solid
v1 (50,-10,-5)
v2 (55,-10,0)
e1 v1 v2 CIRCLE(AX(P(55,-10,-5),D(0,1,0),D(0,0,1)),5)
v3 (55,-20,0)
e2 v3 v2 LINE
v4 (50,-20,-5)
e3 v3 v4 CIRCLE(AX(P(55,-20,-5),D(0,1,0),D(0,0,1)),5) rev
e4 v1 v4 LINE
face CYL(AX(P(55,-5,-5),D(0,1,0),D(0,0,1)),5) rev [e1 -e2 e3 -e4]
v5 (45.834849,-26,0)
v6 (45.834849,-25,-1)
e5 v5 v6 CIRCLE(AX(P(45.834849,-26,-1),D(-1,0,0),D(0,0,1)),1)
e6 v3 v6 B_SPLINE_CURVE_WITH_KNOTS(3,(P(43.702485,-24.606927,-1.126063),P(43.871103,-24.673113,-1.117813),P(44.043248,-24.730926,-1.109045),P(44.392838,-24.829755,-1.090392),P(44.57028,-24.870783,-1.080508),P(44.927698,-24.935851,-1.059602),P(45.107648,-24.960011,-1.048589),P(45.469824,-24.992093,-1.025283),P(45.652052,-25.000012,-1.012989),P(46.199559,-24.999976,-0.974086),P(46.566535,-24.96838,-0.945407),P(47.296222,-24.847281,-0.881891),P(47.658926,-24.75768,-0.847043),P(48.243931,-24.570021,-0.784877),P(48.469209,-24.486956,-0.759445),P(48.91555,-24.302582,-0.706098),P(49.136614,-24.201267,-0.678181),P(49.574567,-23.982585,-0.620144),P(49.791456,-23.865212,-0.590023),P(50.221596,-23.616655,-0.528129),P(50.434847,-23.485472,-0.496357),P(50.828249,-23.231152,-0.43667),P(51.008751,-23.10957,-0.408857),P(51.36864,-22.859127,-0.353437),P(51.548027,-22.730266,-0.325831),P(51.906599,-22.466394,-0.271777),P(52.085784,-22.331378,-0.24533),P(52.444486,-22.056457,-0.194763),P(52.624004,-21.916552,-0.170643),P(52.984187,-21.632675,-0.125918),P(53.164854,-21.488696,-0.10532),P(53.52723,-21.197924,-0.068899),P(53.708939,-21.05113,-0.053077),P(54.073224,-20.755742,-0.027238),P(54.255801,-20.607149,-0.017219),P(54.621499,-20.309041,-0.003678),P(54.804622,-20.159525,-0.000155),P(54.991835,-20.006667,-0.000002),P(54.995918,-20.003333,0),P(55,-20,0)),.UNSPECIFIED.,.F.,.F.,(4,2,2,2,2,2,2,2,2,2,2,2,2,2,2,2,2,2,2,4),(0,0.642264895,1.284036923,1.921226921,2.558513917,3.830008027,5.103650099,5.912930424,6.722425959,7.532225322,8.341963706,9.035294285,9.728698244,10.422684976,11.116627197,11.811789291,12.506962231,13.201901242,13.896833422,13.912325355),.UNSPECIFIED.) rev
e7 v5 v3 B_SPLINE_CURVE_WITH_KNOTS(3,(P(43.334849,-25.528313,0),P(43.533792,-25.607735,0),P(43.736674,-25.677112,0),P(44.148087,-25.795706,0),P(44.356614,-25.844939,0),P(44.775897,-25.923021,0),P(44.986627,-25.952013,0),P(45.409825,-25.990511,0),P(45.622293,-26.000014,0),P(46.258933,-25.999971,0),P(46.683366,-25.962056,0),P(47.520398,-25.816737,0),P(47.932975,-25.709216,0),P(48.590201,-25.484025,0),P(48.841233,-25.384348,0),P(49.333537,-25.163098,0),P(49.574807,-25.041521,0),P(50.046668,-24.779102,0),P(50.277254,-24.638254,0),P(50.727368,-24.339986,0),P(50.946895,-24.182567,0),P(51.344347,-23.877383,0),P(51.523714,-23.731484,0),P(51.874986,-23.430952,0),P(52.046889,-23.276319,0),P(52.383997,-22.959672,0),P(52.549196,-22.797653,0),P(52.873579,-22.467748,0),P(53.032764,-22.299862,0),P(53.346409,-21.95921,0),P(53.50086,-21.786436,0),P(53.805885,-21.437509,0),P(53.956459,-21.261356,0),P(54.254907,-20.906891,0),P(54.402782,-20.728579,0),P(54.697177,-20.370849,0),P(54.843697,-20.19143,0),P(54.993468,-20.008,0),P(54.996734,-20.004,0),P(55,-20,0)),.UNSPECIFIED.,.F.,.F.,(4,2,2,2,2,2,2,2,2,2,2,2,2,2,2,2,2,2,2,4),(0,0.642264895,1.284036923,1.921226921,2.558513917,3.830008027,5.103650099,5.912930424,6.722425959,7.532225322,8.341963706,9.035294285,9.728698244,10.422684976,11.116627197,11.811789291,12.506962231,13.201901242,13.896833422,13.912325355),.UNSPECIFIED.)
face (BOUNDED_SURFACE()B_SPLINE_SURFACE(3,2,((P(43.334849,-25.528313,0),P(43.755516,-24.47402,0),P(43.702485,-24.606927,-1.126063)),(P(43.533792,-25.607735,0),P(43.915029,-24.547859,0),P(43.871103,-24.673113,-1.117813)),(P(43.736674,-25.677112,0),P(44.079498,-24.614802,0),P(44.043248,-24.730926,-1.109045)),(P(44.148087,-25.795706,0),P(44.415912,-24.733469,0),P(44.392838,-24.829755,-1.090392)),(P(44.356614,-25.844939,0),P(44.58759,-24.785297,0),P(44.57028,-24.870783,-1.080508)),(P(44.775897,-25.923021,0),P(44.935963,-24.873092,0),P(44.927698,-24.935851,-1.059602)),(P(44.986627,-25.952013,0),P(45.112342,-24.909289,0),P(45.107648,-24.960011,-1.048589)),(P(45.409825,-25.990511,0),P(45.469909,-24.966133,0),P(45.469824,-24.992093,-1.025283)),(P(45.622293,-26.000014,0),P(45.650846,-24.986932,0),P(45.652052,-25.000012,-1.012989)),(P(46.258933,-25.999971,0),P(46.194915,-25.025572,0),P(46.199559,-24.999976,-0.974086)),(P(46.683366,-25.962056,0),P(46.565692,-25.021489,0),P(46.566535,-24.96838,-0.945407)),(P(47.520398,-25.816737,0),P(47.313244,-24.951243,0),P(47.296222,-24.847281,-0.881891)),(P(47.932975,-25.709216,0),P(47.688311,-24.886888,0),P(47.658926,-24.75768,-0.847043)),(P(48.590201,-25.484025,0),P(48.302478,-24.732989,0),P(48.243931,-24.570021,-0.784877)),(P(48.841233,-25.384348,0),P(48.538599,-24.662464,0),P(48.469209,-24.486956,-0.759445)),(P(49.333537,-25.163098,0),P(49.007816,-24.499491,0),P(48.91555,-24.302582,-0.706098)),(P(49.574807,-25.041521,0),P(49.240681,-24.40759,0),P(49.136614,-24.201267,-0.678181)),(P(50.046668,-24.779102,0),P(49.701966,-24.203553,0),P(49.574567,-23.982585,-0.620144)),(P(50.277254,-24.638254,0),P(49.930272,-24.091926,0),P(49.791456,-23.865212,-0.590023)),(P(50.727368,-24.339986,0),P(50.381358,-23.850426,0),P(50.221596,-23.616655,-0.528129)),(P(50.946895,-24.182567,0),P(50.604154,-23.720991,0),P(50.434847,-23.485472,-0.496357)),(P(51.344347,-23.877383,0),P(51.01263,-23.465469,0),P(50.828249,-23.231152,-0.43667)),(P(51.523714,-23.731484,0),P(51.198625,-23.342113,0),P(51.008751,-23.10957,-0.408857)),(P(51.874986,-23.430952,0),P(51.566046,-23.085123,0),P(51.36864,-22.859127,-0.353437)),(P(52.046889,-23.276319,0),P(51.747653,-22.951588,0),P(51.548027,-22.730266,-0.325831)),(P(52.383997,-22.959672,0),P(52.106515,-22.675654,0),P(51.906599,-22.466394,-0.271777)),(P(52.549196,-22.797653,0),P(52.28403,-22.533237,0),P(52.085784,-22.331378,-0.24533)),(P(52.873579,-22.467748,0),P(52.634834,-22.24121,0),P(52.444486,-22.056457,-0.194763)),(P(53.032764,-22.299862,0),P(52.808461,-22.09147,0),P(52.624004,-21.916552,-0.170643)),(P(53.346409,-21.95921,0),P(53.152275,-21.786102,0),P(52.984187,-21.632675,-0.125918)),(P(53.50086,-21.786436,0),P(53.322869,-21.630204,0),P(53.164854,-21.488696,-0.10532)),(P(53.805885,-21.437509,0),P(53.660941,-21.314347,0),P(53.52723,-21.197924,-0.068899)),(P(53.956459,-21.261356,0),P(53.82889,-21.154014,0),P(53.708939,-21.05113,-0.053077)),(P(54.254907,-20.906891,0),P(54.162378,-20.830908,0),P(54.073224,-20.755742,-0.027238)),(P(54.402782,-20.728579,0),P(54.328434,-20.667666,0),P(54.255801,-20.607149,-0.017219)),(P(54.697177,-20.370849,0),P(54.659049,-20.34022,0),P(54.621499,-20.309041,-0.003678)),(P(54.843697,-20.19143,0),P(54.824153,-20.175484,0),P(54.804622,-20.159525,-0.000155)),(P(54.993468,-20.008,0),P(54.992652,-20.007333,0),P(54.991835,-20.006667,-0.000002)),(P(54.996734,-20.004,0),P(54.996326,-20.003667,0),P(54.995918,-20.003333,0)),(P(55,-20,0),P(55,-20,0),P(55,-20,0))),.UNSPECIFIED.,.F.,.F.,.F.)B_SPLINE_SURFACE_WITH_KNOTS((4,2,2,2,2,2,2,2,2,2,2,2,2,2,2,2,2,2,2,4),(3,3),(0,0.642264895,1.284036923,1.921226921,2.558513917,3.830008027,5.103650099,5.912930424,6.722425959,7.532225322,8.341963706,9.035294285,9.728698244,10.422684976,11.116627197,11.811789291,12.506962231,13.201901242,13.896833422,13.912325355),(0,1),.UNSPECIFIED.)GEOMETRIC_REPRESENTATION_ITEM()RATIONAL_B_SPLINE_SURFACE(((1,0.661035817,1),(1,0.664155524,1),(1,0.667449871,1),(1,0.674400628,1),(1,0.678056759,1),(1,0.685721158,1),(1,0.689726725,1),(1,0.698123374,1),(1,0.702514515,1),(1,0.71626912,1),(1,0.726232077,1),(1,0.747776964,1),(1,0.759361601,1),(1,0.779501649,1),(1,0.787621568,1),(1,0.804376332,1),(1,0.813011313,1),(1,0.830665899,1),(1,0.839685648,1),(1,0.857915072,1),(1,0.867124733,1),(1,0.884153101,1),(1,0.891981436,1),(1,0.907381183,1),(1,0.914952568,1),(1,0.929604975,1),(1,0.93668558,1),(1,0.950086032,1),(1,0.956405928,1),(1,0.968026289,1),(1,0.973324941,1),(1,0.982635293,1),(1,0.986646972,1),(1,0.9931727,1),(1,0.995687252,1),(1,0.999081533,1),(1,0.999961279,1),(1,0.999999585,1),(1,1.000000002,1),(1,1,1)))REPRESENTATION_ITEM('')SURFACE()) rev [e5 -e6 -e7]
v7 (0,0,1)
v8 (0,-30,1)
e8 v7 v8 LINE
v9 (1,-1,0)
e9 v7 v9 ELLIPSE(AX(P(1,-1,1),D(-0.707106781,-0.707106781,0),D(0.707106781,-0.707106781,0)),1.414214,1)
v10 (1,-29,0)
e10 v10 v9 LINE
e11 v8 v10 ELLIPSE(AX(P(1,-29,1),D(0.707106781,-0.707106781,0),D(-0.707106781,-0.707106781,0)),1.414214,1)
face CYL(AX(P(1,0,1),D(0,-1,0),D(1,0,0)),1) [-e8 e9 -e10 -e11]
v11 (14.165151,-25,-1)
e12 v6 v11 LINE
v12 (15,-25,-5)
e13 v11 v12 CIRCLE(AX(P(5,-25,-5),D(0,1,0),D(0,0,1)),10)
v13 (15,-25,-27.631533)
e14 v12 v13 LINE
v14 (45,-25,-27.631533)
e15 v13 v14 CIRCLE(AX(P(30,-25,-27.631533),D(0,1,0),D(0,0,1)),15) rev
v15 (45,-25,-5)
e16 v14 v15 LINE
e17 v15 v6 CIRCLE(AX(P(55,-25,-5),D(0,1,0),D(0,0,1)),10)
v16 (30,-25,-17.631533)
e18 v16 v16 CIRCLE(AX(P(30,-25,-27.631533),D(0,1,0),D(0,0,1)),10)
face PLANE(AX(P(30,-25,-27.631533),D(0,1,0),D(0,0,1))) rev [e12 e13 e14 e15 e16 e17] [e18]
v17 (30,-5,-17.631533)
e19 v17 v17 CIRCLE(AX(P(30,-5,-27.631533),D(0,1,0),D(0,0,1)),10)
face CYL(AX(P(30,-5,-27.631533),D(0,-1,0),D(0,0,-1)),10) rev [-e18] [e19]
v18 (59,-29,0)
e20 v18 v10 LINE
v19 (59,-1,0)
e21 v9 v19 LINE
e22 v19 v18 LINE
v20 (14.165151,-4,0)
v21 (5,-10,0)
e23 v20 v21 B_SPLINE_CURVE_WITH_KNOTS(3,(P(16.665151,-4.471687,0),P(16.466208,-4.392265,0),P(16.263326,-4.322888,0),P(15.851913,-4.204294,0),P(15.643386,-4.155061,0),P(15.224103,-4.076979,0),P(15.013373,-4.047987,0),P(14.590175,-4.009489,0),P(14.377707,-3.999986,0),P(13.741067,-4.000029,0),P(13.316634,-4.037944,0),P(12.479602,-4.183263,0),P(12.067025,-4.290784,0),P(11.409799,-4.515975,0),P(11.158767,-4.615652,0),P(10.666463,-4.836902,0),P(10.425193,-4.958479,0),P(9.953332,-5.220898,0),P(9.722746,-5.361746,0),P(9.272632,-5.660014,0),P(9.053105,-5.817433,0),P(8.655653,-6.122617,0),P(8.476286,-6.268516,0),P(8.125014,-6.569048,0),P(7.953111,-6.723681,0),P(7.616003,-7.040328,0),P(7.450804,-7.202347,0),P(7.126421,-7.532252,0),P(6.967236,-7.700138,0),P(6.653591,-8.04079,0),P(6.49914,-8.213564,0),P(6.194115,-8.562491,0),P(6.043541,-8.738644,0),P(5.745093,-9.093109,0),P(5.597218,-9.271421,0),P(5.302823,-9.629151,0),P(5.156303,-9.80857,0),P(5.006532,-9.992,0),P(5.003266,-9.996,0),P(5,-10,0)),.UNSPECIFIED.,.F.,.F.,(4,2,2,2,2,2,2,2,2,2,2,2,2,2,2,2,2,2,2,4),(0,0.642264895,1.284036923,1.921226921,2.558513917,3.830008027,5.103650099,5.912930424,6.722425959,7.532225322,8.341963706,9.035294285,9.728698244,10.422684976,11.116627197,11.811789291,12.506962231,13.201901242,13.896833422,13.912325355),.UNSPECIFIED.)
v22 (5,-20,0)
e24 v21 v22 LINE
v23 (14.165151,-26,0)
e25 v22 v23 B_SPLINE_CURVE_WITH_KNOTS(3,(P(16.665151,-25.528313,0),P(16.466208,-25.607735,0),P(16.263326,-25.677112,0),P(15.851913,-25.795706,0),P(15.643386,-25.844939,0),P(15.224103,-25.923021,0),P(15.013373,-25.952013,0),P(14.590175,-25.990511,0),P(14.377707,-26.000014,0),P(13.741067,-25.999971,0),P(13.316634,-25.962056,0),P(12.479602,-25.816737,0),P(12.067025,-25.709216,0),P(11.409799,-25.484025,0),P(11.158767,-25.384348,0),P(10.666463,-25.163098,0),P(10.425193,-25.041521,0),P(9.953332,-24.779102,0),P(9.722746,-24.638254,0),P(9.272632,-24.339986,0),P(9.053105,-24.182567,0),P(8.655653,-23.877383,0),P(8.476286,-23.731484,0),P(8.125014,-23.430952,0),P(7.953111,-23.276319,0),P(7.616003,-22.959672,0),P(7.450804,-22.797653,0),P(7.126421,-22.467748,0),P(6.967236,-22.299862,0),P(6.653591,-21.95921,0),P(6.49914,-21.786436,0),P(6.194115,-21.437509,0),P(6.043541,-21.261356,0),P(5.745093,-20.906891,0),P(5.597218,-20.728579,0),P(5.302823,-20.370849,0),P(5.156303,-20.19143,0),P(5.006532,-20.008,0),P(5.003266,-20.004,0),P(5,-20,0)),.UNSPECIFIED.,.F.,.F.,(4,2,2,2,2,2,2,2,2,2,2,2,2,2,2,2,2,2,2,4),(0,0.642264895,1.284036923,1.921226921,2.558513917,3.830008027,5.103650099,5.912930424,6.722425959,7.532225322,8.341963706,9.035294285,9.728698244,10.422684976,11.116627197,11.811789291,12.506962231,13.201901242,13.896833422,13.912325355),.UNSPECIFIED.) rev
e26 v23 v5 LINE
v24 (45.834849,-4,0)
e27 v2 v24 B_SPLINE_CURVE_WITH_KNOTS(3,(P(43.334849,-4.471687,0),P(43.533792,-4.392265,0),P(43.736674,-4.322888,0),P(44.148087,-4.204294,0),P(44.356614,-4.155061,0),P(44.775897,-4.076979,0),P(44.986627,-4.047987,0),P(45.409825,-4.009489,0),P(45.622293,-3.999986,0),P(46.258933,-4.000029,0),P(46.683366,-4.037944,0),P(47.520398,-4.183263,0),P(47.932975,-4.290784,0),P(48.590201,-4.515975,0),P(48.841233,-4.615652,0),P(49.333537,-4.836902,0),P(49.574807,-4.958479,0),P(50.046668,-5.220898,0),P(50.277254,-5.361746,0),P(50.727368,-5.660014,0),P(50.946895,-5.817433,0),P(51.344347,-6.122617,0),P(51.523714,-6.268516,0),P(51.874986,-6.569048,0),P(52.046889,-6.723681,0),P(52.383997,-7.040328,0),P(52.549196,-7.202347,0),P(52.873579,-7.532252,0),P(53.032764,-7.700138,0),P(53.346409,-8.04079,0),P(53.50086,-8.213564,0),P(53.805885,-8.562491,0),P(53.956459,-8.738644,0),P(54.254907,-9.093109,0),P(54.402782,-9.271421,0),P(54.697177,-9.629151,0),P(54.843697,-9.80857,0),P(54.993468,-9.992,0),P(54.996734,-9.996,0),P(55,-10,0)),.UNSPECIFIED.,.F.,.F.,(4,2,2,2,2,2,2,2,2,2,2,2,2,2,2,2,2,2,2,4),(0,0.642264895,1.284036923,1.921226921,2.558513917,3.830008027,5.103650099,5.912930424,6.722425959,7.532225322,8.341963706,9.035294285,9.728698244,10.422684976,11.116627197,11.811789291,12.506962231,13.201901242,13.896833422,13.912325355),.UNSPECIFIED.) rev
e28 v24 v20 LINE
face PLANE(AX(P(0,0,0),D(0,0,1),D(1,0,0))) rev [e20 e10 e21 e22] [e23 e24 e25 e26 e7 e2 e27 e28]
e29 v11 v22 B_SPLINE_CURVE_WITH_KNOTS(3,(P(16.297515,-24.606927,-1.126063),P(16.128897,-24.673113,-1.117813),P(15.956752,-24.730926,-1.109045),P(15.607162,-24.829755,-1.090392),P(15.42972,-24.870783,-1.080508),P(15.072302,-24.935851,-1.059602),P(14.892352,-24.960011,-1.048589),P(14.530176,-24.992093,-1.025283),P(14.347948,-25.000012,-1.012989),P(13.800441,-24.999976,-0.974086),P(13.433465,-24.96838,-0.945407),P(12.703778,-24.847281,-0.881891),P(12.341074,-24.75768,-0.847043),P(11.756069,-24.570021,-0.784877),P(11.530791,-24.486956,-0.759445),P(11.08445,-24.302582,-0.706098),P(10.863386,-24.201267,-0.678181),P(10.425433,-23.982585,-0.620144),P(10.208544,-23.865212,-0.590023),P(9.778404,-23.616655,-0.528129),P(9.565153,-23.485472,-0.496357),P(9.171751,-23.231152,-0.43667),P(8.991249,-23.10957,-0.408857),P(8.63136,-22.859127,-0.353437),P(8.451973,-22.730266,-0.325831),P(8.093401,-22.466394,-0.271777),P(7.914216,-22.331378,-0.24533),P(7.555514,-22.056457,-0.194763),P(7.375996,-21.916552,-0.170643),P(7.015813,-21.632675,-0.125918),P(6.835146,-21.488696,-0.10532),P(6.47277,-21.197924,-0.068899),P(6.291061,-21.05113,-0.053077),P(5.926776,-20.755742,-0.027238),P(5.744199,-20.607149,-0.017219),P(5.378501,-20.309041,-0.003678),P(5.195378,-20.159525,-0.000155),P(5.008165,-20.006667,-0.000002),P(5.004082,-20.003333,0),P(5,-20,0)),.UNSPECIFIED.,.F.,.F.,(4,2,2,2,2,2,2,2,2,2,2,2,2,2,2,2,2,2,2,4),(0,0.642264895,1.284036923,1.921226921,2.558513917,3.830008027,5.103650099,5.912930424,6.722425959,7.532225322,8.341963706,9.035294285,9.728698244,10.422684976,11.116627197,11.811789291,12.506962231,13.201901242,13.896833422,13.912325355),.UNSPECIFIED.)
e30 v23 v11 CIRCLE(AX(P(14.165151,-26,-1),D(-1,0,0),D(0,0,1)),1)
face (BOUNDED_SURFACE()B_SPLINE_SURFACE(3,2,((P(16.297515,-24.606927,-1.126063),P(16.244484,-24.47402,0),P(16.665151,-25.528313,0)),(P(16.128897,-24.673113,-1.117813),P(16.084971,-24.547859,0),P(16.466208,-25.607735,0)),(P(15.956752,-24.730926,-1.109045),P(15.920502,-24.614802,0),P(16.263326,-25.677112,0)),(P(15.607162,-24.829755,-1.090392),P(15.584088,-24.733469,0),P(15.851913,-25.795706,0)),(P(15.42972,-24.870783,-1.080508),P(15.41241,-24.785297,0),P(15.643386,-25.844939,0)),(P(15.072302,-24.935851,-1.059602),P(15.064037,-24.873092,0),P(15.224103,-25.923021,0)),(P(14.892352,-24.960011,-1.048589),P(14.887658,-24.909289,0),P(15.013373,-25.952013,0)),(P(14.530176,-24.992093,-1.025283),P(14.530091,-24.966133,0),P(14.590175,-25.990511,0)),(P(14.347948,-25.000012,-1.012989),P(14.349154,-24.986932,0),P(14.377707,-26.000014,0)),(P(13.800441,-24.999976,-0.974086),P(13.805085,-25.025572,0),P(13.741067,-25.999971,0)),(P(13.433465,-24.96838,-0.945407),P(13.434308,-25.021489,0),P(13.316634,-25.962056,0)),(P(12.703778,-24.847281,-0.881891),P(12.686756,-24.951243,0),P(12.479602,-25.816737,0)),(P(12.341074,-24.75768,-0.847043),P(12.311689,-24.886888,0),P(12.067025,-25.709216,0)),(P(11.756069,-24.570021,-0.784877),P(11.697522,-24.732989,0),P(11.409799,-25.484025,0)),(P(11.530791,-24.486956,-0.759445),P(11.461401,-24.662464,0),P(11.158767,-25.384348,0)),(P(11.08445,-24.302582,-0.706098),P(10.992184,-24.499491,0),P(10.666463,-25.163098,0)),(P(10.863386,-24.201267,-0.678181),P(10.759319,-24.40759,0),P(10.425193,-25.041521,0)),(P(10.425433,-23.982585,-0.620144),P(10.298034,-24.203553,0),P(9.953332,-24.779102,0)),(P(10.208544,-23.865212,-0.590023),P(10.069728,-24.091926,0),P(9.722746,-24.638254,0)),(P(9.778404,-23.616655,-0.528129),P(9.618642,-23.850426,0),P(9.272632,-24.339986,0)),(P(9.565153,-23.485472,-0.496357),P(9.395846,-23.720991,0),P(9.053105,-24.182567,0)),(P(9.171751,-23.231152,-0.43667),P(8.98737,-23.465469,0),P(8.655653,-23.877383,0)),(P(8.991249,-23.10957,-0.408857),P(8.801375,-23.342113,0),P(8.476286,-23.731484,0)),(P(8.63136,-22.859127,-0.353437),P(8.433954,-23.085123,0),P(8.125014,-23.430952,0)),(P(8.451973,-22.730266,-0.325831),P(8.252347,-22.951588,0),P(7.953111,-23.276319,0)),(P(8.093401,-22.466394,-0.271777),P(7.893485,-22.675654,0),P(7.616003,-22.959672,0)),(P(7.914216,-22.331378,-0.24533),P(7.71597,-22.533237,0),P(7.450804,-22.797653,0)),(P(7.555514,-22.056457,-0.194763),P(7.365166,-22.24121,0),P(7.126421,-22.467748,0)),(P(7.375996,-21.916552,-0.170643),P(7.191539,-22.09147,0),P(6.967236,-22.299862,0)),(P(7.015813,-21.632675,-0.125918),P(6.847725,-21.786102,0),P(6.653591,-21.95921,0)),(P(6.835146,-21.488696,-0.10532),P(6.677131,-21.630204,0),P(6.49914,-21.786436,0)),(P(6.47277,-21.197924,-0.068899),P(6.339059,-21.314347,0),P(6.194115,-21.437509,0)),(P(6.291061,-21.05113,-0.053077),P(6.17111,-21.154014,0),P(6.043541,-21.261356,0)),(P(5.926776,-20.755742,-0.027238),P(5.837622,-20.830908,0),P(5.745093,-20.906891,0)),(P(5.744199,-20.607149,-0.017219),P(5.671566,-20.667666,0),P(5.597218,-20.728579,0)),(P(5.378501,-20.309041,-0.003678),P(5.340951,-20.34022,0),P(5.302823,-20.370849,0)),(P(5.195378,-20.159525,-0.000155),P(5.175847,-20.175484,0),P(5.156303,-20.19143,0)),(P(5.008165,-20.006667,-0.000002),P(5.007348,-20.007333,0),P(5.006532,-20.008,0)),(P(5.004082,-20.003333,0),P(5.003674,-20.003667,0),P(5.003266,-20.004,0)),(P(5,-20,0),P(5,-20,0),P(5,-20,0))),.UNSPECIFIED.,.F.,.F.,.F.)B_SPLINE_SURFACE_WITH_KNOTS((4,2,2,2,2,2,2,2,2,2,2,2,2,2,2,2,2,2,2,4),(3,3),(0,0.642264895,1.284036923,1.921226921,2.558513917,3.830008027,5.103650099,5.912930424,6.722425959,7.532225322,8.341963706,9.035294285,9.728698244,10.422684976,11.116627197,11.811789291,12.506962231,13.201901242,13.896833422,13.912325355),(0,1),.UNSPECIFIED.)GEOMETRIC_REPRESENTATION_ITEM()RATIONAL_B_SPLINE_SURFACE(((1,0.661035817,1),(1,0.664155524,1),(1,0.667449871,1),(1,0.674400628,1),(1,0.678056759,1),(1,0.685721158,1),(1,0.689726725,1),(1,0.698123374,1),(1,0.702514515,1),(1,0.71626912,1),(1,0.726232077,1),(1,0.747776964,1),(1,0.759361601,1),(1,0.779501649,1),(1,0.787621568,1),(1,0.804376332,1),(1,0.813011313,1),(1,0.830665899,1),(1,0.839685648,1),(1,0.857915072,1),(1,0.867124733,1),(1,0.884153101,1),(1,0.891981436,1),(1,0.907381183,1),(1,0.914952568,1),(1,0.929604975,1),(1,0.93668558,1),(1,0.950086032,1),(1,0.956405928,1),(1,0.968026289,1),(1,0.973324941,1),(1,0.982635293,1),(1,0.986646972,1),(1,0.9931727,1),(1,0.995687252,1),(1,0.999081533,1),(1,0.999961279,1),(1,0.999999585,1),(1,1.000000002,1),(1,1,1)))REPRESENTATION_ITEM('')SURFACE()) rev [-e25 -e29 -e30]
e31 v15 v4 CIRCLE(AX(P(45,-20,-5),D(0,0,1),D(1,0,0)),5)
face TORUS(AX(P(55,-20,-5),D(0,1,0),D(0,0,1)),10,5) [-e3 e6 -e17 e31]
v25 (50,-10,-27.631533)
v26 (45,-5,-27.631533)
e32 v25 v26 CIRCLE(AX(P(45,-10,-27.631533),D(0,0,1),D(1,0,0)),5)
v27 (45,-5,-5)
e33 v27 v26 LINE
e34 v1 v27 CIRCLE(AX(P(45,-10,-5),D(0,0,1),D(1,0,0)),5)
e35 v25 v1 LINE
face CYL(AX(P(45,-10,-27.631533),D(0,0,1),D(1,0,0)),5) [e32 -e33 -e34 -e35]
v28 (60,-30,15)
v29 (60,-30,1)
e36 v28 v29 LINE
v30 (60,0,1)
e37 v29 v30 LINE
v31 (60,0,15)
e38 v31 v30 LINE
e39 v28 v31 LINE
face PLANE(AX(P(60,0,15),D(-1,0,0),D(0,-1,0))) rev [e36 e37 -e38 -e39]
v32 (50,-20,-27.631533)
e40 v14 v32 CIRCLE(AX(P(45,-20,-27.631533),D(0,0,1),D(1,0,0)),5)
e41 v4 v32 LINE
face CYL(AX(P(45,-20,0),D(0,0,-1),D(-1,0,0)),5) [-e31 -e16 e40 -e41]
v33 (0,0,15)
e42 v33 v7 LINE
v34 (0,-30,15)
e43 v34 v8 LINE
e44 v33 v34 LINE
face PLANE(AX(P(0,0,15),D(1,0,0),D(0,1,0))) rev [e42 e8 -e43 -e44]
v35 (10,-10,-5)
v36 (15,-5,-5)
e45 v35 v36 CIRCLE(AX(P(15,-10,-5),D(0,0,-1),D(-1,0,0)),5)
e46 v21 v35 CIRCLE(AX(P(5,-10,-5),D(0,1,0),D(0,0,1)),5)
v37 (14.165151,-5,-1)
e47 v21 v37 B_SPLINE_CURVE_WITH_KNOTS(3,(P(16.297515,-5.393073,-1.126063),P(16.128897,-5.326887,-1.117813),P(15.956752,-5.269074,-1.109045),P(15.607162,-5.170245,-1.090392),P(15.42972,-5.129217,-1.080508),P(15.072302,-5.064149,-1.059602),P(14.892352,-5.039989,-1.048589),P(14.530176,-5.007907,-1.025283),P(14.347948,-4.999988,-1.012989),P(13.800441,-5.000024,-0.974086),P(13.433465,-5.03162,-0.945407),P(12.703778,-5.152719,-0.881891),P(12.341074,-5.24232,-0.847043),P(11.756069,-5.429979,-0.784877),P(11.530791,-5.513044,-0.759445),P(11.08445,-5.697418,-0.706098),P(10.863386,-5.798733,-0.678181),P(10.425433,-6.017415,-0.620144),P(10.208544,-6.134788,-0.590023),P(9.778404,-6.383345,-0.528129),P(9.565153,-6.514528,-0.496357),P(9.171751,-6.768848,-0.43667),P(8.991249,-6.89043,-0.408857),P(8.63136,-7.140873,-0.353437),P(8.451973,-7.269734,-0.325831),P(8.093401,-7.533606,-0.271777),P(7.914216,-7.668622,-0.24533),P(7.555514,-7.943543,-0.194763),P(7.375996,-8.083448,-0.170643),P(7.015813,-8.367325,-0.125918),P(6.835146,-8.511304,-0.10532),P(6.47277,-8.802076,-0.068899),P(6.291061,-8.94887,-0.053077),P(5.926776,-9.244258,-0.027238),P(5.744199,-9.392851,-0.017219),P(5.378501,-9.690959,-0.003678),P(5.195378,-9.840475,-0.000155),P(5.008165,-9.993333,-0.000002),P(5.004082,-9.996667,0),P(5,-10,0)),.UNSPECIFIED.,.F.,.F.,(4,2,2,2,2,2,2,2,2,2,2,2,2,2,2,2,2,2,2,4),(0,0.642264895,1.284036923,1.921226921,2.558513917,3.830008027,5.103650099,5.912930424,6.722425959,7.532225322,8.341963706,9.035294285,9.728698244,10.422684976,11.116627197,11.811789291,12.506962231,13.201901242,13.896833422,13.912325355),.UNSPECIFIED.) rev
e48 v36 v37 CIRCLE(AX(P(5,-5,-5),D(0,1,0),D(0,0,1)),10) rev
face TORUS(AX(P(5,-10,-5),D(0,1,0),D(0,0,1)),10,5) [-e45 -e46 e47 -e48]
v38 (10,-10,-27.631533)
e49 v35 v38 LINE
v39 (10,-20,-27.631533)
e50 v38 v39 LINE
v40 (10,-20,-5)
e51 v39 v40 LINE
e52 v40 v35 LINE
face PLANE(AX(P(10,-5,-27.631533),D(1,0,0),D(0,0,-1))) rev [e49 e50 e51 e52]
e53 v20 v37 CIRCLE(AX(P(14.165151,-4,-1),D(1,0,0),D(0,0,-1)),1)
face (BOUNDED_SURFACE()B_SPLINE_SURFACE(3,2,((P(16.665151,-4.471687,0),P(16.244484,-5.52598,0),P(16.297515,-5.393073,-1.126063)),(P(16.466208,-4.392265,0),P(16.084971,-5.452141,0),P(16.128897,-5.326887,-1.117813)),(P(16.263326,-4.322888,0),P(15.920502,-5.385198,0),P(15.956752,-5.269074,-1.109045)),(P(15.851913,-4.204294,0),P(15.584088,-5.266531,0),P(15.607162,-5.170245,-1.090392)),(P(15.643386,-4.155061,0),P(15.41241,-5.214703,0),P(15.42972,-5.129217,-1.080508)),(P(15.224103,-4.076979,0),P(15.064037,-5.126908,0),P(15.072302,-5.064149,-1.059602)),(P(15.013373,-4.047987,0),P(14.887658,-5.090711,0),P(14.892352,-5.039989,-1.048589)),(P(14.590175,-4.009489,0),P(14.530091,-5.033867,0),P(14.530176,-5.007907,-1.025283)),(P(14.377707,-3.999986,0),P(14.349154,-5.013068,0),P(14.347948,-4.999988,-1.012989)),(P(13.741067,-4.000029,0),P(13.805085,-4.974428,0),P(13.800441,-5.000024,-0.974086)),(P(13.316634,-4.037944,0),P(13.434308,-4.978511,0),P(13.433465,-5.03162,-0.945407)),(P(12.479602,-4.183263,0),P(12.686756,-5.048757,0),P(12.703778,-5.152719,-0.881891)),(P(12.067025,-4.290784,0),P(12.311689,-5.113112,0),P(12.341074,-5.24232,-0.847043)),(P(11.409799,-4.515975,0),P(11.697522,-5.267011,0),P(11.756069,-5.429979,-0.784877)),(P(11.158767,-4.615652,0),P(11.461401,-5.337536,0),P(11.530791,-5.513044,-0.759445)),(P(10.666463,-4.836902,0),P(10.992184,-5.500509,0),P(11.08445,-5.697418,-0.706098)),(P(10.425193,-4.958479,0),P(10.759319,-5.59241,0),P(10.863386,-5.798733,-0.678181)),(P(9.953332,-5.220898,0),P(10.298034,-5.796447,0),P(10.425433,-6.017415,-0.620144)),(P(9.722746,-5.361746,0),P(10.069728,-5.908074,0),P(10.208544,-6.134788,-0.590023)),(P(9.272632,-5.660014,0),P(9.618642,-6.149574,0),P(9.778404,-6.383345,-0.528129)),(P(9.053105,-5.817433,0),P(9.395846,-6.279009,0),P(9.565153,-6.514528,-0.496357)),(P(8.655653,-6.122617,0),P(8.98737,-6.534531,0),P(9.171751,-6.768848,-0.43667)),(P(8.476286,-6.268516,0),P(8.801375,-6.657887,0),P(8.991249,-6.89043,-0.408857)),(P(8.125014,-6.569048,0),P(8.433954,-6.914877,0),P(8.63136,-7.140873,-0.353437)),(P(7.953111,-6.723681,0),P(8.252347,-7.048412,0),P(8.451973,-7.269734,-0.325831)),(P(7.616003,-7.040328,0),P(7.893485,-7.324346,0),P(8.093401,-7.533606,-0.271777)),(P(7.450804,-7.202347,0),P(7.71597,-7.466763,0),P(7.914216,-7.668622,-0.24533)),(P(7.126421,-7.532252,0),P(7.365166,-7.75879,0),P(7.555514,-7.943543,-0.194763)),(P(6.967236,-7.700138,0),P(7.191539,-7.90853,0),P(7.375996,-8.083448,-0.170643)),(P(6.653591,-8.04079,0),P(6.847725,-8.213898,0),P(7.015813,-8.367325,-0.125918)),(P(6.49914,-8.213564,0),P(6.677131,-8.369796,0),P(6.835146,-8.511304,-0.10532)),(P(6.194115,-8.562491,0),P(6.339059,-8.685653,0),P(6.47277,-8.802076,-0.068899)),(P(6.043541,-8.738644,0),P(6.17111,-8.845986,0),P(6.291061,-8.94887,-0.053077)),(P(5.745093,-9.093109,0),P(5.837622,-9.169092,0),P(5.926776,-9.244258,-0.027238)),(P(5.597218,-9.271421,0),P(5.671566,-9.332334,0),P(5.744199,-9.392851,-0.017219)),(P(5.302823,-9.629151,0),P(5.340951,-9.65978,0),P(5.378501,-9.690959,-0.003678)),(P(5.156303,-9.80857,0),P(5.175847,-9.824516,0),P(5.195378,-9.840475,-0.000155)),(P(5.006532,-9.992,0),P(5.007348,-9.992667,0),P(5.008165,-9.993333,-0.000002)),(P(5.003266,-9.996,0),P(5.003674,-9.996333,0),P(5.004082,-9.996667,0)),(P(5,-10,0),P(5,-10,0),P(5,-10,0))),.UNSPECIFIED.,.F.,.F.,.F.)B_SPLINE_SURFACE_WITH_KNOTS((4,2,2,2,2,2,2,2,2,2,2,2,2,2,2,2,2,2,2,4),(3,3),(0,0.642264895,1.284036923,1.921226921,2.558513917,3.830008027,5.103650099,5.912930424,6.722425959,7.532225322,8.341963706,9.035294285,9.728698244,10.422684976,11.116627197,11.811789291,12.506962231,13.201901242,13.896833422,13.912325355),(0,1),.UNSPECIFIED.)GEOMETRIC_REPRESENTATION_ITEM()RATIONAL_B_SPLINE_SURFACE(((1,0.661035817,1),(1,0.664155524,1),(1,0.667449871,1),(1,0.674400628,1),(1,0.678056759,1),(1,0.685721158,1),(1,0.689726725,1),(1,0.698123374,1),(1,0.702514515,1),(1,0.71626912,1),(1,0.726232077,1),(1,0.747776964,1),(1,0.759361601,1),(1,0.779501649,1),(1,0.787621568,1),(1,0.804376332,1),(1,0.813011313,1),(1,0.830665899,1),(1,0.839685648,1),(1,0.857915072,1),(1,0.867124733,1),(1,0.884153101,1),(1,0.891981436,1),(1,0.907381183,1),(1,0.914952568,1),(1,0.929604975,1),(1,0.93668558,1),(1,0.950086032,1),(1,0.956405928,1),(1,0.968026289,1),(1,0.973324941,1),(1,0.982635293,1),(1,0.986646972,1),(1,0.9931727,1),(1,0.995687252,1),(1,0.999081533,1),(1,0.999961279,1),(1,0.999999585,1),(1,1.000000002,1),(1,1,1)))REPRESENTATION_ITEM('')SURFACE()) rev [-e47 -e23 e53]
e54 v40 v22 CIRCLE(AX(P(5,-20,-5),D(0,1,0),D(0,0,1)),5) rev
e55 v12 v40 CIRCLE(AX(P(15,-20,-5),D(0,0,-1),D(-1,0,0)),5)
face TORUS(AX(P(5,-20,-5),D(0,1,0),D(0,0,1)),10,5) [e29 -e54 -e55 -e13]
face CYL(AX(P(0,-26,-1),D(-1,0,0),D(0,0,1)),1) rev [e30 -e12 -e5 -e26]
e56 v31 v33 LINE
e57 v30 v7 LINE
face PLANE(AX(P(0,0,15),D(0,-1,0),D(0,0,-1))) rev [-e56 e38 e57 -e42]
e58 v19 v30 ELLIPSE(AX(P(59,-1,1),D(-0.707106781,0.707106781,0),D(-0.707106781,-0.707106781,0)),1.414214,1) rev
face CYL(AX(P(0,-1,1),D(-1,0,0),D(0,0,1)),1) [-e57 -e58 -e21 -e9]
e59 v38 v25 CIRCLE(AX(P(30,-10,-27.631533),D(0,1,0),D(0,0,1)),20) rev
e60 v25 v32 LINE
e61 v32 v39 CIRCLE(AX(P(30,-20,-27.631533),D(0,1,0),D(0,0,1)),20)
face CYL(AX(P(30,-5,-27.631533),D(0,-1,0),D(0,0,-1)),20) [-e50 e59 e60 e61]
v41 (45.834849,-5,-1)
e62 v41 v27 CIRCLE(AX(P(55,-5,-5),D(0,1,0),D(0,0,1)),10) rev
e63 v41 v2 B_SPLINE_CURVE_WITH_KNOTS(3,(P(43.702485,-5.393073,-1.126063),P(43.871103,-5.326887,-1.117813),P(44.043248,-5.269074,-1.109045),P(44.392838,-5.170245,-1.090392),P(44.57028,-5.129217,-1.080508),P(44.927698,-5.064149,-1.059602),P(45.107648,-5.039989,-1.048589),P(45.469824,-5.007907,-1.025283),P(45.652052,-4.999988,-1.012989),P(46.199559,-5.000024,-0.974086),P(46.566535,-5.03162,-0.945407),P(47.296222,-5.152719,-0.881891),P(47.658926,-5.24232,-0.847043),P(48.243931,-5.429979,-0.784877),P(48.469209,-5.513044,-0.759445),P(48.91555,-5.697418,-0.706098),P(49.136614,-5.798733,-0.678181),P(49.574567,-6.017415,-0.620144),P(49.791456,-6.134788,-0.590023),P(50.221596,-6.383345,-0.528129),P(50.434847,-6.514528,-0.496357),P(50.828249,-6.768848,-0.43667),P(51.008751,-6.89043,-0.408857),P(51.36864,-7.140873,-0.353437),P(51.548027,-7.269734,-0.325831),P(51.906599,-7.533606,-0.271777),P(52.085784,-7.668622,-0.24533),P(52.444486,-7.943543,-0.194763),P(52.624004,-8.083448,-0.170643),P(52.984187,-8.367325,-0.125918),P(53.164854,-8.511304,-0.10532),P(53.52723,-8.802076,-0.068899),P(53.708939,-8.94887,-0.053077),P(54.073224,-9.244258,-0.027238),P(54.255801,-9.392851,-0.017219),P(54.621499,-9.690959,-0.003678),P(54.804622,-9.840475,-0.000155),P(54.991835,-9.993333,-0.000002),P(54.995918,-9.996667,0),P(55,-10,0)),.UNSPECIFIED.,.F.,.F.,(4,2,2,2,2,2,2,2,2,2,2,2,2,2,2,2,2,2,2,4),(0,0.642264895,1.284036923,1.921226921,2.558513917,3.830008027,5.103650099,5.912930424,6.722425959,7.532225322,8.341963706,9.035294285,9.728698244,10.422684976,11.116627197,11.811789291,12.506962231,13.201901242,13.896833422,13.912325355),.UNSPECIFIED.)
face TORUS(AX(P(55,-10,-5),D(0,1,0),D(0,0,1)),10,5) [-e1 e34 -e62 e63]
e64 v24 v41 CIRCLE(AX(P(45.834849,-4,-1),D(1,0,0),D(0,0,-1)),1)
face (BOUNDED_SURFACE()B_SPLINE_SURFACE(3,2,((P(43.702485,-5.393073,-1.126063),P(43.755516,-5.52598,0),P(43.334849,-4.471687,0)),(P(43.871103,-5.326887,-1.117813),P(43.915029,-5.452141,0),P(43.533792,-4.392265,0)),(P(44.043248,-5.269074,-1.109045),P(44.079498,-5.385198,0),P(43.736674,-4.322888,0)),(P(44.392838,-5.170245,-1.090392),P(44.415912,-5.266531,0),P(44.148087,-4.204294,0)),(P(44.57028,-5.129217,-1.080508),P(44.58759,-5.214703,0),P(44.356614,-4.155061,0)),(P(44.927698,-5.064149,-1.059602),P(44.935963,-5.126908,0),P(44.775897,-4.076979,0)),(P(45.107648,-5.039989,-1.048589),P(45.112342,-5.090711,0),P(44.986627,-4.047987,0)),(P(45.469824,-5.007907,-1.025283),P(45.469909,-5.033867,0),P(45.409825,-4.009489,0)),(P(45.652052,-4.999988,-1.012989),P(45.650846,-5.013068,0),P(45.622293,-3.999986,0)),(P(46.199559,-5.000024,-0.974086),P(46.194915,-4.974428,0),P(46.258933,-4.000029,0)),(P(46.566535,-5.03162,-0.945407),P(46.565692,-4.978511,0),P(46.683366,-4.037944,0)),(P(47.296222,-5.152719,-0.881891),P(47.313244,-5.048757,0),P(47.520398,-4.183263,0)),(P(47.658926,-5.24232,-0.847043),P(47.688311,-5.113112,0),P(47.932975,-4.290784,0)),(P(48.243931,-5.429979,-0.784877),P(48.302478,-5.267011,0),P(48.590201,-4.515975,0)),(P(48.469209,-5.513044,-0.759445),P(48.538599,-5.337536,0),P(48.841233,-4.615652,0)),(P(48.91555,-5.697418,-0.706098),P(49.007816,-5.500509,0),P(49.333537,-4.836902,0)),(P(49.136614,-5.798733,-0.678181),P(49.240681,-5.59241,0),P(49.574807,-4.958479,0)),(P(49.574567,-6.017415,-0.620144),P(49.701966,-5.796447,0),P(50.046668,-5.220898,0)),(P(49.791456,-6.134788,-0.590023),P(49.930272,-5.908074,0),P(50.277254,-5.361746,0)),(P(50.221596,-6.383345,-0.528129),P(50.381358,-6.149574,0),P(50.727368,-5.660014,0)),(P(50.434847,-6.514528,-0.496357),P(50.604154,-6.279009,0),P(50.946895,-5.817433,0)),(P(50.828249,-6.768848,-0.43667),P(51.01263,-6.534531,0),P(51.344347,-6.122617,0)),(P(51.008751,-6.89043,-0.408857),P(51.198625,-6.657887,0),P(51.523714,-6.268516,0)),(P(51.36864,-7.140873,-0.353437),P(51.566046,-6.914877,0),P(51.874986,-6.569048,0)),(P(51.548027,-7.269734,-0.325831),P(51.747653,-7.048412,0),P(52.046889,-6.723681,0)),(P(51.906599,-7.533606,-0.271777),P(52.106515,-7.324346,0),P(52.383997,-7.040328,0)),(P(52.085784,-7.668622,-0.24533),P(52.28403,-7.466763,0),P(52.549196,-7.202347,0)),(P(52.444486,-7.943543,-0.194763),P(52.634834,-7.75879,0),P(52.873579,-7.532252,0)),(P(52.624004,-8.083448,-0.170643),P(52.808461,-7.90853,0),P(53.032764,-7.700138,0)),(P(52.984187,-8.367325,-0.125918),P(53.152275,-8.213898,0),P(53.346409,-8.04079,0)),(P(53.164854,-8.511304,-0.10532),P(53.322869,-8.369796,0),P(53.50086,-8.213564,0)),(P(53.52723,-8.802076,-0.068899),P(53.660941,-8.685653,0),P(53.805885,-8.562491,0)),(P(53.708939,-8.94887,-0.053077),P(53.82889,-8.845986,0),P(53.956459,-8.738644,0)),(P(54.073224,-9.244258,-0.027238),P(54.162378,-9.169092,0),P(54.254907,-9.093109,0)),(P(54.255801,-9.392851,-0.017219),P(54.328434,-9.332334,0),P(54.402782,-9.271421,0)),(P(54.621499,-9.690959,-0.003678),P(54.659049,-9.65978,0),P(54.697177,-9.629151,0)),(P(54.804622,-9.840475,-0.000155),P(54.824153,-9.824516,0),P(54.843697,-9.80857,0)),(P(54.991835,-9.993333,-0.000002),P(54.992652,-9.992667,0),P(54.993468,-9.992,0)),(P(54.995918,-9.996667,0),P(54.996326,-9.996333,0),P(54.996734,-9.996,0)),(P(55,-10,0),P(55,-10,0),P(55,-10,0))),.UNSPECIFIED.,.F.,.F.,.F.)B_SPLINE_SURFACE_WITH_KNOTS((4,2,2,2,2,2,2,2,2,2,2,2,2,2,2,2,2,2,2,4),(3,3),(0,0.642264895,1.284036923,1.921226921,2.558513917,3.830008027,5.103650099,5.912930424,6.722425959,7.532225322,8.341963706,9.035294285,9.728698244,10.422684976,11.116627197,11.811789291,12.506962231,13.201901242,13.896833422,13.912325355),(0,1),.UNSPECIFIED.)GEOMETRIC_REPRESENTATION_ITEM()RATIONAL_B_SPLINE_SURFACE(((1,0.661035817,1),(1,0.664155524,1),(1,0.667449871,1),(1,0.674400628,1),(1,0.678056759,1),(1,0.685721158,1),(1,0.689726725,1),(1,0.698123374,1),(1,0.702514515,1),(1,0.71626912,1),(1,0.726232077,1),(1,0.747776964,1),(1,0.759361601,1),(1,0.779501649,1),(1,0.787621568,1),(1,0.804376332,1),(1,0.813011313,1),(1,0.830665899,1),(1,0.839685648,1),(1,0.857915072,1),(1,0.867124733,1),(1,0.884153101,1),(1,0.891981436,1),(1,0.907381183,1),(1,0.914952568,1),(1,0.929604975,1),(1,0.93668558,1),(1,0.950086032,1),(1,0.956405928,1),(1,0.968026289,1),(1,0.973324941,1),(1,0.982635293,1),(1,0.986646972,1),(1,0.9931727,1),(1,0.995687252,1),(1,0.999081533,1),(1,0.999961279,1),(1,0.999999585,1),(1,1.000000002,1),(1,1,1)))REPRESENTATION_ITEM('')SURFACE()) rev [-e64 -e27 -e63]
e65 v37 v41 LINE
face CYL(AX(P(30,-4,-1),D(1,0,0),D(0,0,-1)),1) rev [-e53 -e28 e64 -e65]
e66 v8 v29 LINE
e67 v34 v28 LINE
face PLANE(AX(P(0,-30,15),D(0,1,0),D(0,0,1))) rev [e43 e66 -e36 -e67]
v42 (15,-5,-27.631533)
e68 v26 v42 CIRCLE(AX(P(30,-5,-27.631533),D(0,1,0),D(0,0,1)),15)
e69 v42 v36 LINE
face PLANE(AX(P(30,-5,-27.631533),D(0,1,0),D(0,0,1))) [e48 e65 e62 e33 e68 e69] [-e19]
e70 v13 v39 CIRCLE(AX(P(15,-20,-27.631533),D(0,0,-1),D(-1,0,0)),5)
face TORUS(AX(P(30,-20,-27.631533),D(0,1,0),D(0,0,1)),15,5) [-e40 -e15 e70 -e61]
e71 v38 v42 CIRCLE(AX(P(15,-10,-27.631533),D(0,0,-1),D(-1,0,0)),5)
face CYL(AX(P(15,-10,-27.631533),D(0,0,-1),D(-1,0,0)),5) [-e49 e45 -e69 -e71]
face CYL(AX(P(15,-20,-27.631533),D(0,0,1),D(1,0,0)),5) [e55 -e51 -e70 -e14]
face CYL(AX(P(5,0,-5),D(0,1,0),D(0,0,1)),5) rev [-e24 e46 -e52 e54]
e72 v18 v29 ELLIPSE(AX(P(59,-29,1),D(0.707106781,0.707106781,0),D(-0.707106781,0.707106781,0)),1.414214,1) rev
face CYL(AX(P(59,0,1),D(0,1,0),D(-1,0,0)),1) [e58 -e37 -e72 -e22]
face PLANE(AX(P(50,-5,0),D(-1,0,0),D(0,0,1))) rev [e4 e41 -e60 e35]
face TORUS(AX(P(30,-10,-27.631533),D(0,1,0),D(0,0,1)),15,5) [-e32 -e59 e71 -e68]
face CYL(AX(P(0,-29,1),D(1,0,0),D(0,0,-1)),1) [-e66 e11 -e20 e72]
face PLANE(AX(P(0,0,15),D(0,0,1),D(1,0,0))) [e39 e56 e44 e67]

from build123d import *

# Parameters (mm, degrees)
SKETCH3_W           = 60
SKETCH3_H           = 30
BOSS_EXTRUDE1_DEPTH = 15
SKETCH4_R           = 10
BOSS_EXTRUDE2_DEPTH = 10
FILLET1_R           = 5
FILLET2_R           = 5
FILLET3_R           = 1


with BuildPart() as part:
    # Sketch3 → Boss-Extrude1 (new body)
    with BuildSketch(Plane.XY):
        with Locations((30, -15)):
            Rectangle(SKETCH3_W, SKETCH3_H)
    extrude(amount=BOSS_EXTRUDE1_DEPTH)

    # Sketch4 → Boss-Extrude2 (add, symmetric)
    with BuildSketch(Plane(origin=(0, -15, 0), x_dir=(1, 0, 0), z_dir=(0, 1, 0))):
        with BuildLine():
            Line((10, 27.631533215), (10, 0))
            Line((10, 0), (50, 0))
            Line((50, 0), (50, 27.631533215))
            ThreePointArc((50, 27.631533215), (30, 47.631533215), (10, 27.631533215))
        make_face()
        with Locations(Location((30, 27.631533215, 0), (0, 0, 270))):
            Circle(SKETCH4_R, mode=Mode.SUBTRACT)
    extrude(amount=BOSS_EXTRUDE2_DEPTH, both=True)

    # Fillet1
    fillet1_edges = [part.edges().sort_by_distance(p)[0] for p in [
        (10, -15, 0),
        (50, -15, 0),
    ]]
    fillet(fillet1_edges, radius=FILLET1_R)

    # Fillet2
    # the kernel refuses this fillet: 5 mm, written as the material it takes off along each edge
    with BuildSketch(Plane(origin=(30, -5, -27.631533215), x_dir=(1, 0, 0), z_dir=(0, 0, 1))) as fillet2_piece_1:
        with BuildLine():
            CenterArc((20 - FILLET2_R, -FILLET2_R), FILLET2_R, 0, 90)
            Line((20 - FILLET2_R, 0), (20, 0))
            Line((20, 0), (20, -FILLET2_R))
        make_face()
    revolve(axis=Axis((30, -5, -27.631533215), (0, 1, 0)), revolution_arc=180, mode=Mode.SUBTRACT)
    with BuildSketch(Plane(origin=(10, -5, -27.631533215), x_dir=(0, -1, 0), z_dir=(0, 0, 1)), Plane(origin=(50, -5, -5), x_dir=(0, -1, 0), z_dir=(0, 0, -1))) as fillet2_piece_2:
        with BuildLine():
            CenterArc((FILLET2_R, FILLET2_R), FILLET2_R, 180, 90)
            Line((0, FILLET2_R), (0, 0))
            Line((0, 0), (FILLET2_R, 0))
        make_face()
    extrude(amount=22.631533215, mode=Mode.SUBTRACT)
    with BuildSketch(Plane(origin=(30, -25, -27.631533215), x_dir=(1, 0, 0), z_dir=(0, 0, 1))) as fillet2_piece_3:
        with BuildLine():
            CenterArc((20 - FILLET2_R, FILLET2_R), FILLET2_R, 270, 90)
            Line((20 - FILLET2_R, 0), (20, 0))
            Line((20, 0), (20, FILLET2_R))
        make_face()
    revolve(axis=Axis((30, -25, -27.631533215), (0, 1, 0)), revolution_arc=180, mode=Mode.SUBTRACT)
    with BuildSketch(Plane(origin=(10, -25, -27.631533215), x_dir=(0, 1, 0), z_dir=(0, 0, 1)), Plane(origin=(50, -25, -5), x_dir=(0, 1, 0), z_dir=(0, 0, -1))) as fillet2_piece_4:
        with BuildLine():
            CenterArc((FILLET2_R, -FILLET2_R), FILLET2_R, 90, 90)
            Line((0, -FILLET2_R), (0, 0))
            Line((0, 0), (FILLET2_R, 0))
        make_face()
    extrude(amount=22.631533215, mode=Mode.SUBTRACT)
    with BuildSketch(Plane(origin=(55, -25, -5), x_dir=(0.5976672776328272, 0, -0.8017442392976484), z_dir=(-0.8017442392976484, 0, -0.5976672776328272))) as fillet2_piece_5_section:
        with BuildLine():
            CenterArc((5 + FILLET2_R, -FILLET2_R), FILLET2_R, 90, 90)
            Line((5 + FILLET2_R, 0), (5, 0))
            Line((5, 0), (5, -FILLET2_R))
        make_face()
    fillet2_piece_5 = revolve(axis=Axis((55, -25, -5), (0, -1, 0)), revolution_arc=233.296989237, mode=Mode.PRIVATE)
    fillet2_piece_5 = split(fillet2_piece_5, bisect_by=Plane(origin=(51.250305352, -23.441858441, 0), z_dir=(0, 0, -1)), keep=Keep.TOP, mode=Mode.PRIVATE)
    add(fillet2_piece_5, mode=Mode.SUBTRACT)
    with BuildSketch(Plane(origin=(55, -5, -5), x_dir=(0.5976672776328272, 0, -0.8017442392976484), z_dir=(-0.8017442392976484, 0, -0.5976672776328272))) as fillet2_piece_6_section:
        with BuildLine():
            CenterArc((5 + FILLET2_R, FILLET2_R), FILLET2_R, 180, 90)
            Line((5, FILLET2_R), (5, 0))
            Line((5, 0), (5 + FILLET2_R, 0))
        make_face()
    fillet2_piece_6 = revolve(axis=Axis((55, -5, -5), (0, -1, 0)), revolution_arc=233.296989237, mode=Mode.PRIVATE)
    fillet2_piece_6 = split(fillet2_piece_6, bisect_by=Plane(origin=(51.250305352, -6.558141559, 0), z_dir=(0, 0, -1)), keep=Keep.TOP, mode=Mode.PRIVATE)
    add(fillet2_piece_6, mode=Mode.SUBTRACT)
    with BuildSketch(Plane(origin=(5, -25, -5), x_dir=(-0.5976672776328278, 0, -0.801744239297648), z_dir=(0.801744239297648, 0, -0.5976672776328278))) as fillet2_piece_7_section:
        with BuildLine():
            CenterArc((5 + FILLET2_R, FILLET2_R), FILLET2_R, 180, 90)
            Line((5 + FILLET2_R, 0), (5, 0))
            Line((5, 0), (5, FILLET2_R))
        make_face()
    fillet2_piece_7 = revolve(axis=Axis((5, -25, -5), (0, 1, 0)), revolution_arc=233.296989237, mode=Mode.PRIVATE)
    fillet2_piece_7 = split(fillet2_piece_7, bisect_by=Plane(origin=(8.749694574, -23.441858005, 0), z_dir=(0, 0, -1)), keep=Keep.TOP, mode=Mode.PRIVATE)
    add(fillet2_piece_7, mode=Mode.SUBTRACT)
    with BuildSketch(Plane(origin=(5, -5, -5), x_dir=(-0.5976672776328278, 0, -0.801744239297648), z_dir=(0.801744239297648, 0, -0.5976672776328278))) as fillet2_piece_8_section:
        with BuildLine():
            CenterArc((5 + FILLET2_R, -FILLET2_R), FILLET2_R, 90, 90)
            Line((5 + FILLET2_R, 0), (5, 0))
            Line((5, 0), (5, -FILLET2_R))
        make_face()
    fillet2_piece_8 = revolve(axis=Axis((5, -5, -5), (0, 1, 0)), revolution_arc=233.296989237, mode=Mode.PRIVATE)
    fillet2_piece_8 = split(fillet2_piece_8, bisect_by=Plane(origin=(8.749694574, -6.558141995, 0), z_dir=(0, 0, -1)), keep=Keep.TOP, mode=Mode.PRIVATE)
    add(fillet2_piece_8, mode=Mode.SUBTRACT)

    # Fillet3
    fillet3_edges = [part.edges().sort_by_distance(p)[0] for p in [
        (30, 0, 0),
        (60, -15, 0),
        (30, -30, 0),
        (30, -25, 0),
        (0, -15, 0),
        (30, -5, 0),
        (51.140144071, -23.381125805, 0),
        (8.859855929, -23.381125805, 0),
        (51.140144071, -6.618874195, 0),
        (8.859855929, -6.618874195, 0),
    ]]
    fillet(fillet3_edges, radius=FILLET3_R)


solid = part.part
